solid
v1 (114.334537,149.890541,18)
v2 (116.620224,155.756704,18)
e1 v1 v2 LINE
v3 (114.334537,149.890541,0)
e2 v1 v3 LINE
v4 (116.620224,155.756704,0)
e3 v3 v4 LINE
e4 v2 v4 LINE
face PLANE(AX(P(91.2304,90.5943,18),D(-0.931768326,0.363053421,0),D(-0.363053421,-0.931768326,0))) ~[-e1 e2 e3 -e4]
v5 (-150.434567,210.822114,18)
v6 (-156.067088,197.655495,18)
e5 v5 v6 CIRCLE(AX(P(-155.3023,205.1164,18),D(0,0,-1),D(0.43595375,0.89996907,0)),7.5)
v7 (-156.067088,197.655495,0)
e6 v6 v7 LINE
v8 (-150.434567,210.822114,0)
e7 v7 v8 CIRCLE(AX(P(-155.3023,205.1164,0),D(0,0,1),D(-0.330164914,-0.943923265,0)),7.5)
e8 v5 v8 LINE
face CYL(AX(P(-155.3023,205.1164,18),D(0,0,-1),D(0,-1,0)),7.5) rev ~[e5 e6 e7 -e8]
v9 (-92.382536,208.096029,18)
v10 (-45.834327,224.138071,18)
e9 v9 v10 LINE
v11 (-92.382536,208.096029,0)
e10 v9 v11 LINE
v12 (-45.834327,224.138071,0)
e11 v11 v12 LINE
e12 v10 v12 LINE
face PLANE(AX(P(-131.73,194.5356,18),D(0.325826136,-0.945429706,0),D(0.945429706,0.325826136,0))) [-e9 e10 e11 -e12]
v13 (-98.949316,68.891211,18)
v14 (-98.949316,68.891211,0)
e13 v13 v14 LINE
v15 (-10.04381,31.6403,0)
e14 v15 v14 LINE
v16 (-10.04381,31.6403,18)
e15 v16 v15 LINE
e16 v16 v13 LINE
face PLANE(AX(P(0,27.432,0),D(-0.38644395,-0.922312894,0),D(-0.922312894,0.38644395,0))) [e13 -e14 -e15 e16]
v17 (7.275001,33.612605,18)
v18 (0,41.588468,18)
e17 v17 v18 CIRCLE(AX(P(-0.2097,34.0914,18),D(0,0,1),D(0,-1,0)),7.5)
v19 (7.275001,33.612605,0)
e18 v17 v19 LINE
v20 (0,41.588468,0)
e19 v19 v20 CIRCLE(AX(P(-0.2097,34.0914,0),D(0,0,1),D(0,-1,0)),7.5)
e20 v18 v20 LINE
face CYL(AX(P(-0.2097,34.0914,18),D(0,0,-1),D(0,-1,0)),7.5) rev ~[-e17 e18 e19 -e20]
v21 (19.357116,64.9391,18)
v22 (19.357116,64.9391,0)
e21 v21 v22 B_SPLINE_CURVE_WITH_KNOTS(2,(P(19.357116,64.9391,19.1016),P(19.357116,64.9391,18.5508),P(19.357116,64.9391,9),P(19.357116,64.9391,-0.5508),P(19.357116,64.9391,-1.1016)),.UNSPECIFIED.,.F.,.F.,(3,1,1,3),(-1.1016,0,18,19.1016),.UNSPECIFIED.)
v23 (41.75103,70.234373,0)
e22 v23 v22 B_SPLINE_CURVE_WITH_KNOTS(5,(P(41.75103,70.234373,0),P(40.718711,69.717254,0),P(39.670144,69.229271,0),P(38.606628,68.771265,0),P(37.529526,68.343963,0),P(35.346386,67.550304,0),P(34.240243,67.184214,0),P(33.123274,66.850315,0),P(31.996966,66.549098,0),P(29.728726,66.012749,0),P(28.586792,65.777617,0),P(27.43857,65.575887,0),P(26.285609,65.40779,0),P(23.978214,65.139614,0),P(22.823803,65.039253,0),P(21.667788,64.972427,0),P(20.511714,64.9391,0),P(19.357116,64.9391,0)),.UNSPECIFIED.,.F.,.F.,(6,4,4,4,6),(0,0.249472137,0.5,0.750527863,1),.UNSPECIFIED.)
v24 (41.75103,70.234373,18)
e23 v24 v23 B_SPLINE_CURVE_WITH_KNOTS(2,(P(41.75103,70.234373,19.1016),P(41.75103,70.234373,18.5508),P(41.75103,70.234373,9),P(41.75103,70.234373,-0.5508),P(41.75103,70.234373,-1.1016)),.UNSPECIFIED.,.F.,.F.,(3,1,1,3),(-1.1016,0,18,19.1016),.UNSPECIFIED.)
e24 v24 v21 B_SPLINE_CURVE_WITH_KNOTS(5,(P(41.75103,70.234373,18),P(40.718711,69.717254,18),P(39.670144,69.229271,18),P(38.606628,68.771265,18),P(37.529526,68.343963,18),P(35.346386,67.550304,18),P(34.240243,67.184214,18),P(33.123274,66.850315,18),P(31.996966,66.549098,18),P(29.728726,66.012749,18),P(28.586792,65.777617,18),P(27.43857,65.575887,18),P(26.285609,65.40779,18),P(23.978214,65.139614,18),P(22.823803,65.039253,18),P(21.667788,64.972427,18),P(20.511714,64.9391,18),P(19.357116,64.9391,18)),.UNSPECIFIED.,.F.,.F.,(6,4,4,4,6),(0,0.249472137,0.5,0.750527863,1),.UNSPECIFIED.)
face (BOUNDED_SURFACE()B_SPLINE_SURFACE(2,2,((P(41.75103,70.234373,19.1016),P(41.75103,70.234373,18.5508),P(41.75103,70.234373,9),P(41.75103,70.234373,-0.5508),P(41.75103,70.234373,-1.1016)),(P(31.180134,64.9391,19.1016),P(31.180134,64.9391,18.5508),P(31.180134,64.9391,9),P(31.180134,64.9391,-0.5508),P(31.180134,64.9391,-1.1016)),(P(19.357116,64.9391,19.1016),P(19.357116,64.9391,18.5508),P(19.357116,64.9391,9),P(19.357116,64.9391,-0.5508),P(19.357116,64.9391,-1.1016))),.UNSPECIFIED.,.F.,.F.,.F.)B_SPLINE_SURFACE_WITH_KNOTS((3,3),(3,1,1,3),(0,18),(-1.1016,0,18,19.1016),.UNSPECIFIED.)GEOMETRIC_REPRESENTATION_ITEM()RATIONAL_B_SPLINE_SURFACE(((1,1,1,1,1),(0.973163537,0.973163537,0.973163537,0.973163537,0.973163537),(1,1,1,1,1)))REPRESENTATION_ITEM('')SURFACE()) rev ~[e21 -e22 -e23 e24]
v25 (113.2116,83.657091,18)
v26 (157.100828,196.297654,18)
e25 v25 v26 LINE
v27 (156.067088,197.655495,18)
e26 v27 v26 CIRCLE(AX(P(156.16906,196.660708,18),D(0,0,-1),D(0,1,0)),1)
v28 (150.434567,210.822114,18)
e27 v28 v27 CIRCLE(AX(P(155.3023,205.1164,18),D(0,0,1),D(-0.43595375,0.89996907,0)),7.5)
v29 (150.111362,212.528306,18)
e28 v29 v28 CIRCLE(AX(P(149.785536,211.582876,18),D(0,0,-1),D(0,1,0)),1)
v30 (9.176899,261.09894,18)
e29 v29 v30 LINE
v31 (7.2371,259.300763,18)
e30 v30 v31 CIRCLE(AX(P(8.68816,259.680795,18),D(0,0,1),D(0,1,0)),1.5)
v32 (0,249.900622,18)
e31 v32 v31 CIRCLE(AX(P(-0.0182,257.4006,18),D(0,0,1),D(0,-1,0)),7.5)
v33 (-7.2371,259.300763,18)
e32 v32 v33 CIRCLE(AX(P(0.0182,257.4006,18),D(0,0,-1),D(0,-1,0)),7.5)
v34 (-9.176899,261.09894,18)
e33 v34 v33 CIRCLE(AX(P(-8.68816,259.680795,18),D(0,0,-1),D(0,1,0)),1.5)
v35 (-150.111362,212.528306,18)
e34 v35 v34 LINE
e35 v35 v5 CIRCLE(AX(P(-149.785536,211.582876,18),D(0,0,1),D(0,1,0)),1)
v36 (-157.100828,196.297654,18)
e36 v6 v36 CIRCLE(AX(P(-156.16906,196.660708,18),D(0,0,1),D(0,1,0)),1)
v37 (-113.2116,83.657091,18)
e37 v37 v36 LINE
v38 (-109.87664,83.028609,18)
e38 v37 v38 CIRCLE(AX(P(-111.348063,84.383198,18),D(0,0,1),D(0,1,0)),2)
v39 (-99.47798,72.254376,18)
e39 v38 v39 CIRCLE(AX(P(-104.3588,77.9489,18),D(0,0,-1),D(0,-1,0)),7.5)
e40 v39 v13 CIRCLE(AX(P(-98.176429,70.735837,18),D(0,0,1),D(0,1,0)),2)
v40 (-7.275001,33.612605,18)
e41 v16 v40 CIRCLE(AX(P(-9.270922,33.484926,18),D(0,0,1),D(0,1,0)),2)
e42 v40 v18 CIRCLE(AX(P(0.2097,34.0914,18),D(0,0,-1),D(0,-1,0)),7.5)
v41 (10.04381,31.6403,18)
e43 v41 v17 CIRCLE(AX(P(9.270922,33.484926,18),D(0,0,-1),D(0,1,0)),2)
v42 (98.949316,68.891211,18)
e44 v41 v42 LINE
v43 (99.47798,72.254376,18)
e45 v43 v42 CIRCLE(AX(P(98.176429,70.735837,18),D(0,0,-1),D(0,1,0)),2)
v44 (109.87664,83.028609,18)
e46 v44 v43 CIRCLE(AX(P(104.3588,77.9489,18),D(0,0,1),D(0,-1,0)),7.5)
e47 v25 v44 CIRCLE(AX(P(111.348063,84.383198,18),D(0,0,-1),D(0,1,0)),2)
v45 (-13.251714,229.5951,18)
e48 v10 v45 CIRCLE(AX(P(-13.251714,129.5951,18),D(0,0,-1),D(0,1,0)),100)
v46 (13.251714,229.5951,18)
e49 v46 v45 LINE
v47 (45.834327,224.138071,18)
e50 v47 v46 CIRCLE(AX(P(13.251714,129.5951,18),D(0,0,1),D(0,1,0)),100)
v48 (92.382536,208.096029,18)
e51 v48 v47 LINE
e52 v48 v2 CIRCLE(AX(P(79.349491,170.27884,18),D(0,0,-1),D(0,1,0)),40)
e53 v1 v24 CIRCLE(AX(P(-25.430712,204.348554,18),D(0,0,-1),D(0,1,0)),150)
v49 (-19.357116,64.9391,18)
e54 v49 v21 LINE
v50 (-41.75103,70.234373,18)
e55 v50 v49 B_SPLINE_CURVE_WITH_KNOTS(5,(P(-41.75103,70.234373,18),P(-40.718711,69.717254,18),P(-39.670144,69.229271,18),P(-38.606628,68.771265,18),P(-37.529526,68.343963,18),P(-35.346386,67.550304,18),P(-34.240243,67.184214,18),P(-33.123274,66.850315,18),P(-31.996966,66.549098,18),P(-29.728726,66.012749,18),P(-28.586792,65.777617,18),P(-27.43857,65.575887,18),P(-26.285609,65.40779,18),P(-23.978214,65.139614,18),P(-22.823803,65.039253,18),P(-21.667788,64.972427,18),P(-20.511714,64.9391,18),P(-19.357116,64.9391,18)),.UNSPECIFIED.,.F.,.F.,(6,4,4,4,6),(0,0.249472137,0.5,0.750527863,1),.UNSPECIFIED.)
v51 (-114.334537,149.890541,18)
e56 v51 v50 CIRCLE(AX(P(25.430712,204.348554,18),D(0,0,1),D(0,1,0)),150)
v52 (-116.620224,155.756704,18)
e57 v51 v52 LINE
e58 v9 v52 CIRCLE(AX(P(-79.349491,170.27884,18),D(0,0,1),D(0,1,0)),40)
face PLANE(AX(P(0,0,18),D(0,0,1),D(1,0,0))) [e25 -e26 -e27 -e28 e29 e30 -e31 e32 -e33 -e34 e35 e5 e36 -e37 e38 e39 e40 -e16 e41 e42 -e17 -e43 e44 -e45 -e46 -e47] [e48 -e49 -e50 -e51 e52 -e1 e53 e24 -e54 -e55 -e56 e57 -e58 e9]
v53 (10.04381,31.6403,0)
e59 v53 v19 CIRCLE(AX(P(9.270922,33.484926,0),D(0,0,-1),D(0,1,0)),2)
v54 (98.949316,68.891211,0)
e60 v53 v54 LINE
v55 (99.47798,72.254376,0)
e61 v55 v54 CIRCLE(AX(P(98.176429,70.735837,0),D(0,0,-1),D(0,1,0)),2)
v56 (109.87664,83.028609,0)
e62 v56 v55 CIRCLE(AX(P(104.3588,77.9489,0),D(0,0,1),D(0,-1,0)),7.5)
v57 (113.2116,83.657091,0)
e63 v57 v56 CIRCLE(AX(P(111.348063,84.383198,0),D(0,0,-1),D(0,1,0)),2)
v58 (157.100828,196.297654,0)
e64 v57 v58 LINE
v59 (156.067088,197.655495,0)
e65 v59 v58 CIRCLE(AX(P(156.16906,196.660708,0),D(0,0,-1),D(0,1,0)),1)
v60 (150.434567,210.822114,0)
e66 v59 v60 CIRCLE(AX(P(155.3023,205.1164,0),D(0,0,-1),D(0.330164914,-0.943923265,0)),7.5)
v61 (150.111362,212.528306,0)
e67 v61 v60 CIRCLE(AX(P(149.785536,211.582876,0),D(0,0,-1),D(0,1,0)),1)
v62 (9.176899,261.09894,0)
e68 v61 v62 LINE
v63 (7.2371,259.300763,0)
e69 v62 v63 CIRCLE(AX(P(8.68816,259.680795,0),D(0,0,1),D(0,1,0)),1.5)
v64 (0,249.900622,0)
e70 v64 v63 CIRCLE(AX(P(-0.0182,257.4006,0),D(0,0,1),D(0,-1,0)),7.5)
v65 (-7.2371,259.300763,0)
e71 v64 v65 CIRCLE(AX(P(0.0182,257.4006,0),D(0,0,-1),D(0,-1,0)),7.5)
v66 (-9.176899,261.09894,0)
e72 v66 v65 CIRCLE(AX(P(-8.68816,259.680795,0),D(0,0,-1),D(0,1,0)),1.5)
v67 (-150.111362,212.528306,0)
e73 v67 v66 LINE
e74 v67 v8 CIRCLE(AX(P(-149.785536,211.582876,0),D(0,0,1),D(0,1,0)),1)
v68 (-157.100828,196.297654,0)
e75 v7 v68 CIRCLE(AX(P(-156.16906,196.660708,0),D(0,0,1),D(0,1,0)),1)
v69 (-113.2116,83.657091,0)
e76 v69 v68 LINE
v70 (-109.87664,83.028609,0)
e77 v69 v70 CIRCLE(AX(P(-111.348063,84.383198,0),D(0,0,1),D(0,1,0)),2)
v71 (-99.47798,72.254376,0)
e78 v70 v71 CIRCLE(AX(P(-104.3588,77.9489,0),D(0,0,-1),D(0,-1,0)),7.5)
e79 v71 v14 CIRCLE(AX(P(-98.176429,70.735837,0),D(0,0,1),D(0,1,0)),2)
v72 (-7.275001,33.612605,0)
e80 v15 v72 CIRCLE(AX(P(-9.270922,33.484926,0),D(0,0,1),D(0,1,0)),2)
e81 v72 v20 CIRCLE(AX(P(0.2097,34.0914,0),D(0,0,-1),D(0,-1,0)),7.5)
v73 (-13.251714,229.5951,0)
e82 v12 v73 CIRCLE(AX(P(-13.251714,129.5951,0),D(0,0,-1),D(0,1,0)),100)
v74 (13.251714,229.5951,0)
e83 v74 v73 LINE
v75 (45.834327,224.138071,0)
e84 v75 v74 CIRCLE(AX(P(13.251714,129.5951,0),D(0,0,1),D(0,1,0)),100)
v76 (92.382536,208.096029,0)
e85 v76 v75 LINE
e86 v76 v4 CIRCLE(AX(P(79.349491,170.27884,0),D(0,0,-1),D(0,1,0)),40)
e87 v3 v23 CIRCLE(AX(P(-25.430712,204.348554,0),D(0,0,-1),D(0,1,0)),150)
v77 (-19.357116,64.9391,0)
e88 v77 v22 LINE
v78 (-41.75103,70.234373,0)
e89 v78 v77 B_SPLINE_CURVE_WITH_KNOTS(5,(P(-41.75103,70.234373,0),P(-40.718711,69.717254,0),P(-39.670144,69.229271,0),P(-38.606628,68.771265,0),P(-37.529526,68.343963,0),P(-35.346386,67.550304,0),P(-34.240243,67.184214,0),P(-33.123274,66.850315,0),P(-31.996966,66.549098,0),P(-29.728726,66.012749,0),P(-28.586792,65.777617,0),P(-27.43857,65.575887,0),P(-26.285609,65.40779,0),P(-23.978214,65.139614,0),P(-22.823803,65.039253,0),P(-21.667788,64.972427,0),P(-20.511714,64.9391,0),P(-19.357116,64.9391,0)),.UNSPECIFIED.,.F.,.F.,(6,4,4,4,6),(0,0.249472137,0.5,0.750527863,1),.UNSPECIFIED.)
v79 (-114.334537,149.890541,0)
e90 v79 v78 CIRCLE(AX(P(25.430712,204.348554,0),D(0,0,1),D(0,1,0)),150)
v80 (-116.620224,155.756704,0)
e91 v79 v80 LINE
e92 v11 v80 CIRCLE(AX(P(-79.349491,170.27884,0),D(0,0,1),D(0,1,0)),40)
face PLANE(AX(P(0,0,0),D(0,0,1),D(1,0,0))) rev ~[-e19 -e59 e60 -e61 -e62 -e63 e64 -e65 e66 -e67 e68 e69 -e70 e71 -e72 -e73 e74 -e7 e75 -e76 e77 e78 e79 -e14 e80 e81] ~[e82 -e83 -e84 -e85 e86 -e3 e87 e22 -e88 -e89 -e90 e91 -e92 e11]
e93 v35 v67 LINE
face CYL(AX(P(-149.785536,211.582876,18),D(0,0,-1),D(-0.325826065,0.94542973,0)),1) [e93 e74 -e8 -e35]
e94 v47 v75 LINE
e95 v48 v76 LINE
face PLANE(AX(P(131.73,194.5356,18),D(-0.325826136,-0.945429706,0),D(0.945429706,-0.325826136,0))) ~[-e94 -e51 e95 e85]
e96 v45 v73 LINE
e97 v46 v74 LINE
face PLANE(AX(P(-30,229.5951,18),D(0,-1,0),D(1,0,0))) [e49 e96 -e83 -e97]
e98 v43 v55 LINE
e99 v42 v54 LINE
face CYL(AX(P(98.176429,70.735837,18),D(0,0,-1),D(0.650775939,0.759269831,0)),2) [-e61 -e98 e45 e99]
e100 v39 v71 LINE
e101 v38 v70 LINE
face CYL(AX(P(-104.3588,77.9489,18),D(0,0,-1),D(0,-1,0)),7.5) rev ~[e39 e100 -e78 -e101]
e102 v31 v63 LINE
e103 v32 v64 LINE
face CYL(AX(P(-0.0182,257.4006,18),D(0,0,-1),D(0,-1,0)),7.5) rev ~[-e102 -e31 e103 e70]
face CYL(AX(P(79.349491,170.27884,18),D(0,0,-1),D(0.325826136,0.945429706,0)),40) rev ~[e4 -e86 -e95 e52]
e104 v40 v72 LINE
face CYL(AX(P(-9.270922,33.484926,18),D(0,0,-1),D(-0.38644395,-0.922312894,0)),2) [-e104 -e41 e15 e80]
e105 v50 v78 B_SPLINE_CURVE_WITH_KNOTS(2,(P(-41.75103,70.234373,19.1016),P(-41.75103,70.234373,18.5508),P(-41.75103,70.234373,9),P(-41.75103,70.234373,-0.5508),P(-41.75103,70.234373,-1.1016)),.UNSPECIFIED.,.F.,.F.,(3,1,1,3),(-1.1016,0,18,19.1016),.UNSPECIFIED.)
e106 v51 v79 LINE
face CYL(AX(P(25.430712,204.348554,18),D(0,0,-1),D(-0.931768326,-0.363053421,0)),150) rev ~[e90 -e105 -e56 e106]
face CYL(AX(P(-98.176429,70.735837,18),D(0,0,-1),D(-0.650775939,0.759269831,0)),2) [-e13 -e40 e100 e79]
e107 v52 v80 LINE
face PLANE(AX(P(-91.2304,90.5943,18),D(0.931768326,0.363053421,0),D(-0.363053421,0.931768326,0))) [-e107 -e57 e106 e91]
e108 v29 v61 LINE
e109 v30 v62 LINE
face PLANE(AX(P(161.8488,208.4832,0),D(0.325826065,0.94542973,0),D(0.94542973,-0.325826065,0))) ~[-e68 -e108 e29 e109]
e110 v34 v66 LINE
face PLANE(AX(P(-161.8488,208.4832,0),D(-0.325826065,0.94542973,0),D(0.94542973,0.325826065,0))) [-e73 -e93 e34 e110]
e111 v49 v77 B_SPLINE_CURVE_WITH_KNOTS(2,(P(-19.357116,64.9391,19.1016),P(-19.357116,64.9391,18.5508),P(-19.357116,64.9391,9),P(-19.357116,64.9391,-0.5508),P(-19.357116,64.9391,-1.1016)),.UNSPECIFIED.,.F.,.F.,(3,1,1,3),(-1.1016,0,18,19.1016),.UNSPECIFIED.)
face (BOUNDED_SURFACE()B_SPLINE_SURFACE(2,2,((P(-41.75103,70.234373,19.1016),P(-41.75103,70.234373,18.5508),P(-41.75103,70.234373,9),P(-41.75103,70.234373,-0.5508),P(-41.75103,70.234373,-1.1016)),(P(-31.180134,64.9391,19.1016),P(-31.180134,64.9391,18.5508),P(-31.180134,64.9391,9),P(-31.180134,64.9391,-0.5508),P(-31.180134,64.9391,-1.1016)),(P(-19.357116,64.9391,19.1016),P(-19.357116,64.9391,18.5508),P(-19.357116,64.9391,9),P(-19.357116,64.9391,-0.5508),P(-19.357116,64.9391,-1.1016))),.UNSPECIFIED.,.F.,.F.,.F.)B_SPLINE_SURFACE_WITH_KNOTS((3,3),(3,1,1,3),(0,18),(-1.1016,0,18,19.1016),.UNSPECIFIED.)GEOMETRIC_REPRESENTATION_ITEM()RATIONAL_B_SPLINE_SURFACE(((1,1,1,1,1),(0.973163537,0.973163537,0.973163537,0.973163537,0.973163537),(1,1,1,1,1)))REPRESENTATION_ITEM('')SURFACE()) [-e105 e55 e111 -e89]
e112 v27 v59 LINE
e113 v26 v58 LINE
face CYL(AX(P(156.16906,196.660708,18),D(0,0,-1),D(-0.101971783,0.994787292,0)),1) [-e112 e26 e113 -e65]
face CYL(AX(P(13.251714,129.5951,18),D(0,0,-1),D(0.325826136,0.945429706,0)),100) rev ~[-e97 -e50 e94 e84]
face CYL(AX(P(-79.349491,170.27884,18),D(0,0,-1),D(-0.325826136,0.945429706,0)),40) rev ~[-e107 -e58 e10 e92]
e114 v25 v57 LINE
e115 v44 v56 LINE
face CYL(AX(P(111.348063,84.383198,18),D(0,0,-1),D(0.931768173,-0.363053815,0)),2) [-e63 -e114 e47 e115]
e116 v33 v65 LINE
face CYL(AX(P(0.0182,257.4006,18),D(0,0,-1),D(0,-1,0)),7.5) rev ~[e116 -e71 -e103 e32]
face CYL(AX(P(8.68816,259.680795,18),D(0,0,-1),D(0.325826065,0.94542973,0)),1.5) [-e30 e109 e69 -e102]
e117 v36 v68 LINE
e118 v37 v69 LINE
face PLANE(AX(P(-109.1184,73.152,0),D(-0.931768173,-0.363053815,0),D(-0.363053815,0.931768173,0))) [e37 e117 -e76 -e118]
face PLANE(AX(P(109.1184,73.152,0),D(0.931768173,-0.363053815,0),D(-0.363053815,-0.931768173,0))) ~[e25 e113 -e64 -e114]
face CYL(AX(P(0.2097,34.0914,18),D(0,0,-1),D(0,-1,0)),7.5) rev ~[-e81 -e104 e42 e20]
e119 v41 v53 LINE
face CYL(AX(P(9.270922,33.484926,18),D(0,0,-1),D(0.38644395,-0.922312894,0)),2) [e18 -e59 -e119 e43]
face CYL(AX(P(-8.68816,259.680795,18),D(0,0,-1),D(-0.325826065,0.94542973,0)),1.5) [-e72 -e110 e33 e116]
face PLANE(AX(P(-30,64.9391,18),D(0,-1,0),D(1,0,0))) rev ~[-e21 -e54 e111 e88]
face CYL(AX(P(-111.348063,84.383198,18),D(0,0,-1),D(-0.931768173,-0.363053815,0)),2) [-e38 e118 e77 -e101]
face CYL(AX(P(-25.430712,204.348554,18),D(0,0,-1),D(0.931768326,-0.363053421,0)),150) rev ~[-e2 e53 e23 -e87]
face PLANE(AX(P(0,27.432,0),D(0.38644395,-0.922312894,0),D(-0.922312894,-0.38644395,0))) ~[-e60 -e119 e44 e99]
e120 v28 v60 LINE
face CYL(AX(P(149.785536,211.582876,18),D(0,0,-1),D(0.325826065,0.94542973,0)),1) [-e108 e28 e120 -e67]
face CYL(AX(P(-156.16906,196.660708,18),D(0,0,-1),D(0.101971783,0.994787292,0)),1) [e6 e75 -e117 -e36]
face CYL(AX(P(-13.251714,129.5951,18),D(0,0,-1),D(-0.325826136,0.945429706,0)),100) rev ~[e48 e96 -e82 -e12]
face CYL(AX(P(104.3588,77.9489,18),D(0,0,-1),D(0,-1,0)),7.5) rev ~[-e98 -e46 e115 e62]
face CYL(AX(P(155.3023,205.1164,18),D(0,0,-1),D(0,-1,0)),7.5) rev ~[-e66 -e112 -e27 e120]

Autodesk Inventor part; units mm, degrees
ref_plane "YZ Plane" through (0, 0, 0) normal (1, 0, 0) x (0, 1, 0)
ref_plane "XZ Plane" through (0, 0, 0) normal (0, 1, 0) x (-1, 0, 0)
ref_plane "XY Plane" through (0, 0, 0) normal (0, 0, 1) x (1, 0, 0)
sketch "Sketch1" plane through (0, 0, 0) normal (0, 0, 1) x (1, 0, 0)
  line L0 (0, 27.432) -> (-109.1184, 73.152)
  line L1 (-109.1184, 73.152) -> (-161.8488, 208.4832)
  line L2 (-161.8488, 208.4832) -> (0, 264.2616)
  line L3 (0, 562.8605) -> (0, -145.2705) construction
  line L4 (0, 264.2616) -> (0, 27.432)
  point P0 (0, 0)
  dimension "d9" = 264.2616
  dimension "d11" = 161.8488
  dimension "d15" = 208.4832
  dimension "d20" = 109.1184
  dimension "d22" = 73.152
  dimension "d39" = 0
  dimension "d41" = 0
  dimension "d42" = 27.432
extrude "Extrusion4" add sketch "Sketch1" along normal blind 18
hole "Hole2" at (0.0182, 257.4006, 18) direction (0, 0, -1) diameter 15 end through all
hole "Hole3" at (-155.3023, 205.1164, 18) direction (0, 0, -1) diameter 15 end through all
hole "Hole4" at (-104.3588, 77.9489, 18) direction (0, 0, -1) diameter 15 end through all
hole "Hole5" at (0.2097, 34.0914, 18) direction (0, 0, -1) diameter 15 end through all
fillet "Fillet7" radius 1.5 1 edges at (-5.647, 262.3155, 9)
fillet "Fillet8" radius 1 1 edges at (-152.0327, 211.8661, 9)
fillet "Fillet9" radius 1 1 edges at (-157.7785, 198.0369, 9)
fillet "Fillet10" radius 2 1 edges at (-111.6584, 79.6709, 9)
fillet "Fillet11" radius 2 1 edges at (-102.9745, 70.5777, 9)
fillet "Fillet12" radius 2 1 edges at (-6.056, 29.9694, 9)
sketch "Sketch5" plane through (0, 0, 18) normal (0, 0, 1) x (1, 0, 0)
  line L0 (0, 41.5885) -> (0, 249.9006) projected
  line L1 (-91.2304, 90.5943) -> (-131.73, 194.5356)
  line L2 (-131.73, 194.5356) -> (-30, 229.5951)
  line L3 (-30, 229.5951) -> (0, 229.5951)
  line L4 (-9.1769, 261.0989) -> (-150.1114, 212.5283) projected
  line L5 (-157.1008, 196.2976) -> (-113.2116, 83.657) projected
  line L6 (-98.9493, 68.8912) -> (-10.0438, 31.6403) projected
  line L7 (-91.2304, 90.5943) -> (-30, 64.9391)
  line L8 (-30, 64.9391) -> (0, 64.9391)
  point P0 (0, 0)
  dimension "d148" = 23
  dimension "d149" = 23
  dimension "d151" = 23
  dimension "d152" = 30
  dimension "d153" = 30
extrude "Extrusion5" cut sketch "Sketch5" against normal through all
fillet "Fillet14" radius 40 1 edges at (-131.73, 194.5356, 9)
fillet "Fillet15" radius 100 1 edges at (-30, 229.5951, 9)
fillet "Fillet16" radius 150 1 edges at (-91.2304, 90.5943, 9)
fillet "Fillet17" radius 50 1 edges at (-30, 64.9391, 9)
mirror "Mirror2" about plane through (0, 0, 0) normal (1, 0, 0)
properties part number "section1" material "Polyethylene, High Density"
